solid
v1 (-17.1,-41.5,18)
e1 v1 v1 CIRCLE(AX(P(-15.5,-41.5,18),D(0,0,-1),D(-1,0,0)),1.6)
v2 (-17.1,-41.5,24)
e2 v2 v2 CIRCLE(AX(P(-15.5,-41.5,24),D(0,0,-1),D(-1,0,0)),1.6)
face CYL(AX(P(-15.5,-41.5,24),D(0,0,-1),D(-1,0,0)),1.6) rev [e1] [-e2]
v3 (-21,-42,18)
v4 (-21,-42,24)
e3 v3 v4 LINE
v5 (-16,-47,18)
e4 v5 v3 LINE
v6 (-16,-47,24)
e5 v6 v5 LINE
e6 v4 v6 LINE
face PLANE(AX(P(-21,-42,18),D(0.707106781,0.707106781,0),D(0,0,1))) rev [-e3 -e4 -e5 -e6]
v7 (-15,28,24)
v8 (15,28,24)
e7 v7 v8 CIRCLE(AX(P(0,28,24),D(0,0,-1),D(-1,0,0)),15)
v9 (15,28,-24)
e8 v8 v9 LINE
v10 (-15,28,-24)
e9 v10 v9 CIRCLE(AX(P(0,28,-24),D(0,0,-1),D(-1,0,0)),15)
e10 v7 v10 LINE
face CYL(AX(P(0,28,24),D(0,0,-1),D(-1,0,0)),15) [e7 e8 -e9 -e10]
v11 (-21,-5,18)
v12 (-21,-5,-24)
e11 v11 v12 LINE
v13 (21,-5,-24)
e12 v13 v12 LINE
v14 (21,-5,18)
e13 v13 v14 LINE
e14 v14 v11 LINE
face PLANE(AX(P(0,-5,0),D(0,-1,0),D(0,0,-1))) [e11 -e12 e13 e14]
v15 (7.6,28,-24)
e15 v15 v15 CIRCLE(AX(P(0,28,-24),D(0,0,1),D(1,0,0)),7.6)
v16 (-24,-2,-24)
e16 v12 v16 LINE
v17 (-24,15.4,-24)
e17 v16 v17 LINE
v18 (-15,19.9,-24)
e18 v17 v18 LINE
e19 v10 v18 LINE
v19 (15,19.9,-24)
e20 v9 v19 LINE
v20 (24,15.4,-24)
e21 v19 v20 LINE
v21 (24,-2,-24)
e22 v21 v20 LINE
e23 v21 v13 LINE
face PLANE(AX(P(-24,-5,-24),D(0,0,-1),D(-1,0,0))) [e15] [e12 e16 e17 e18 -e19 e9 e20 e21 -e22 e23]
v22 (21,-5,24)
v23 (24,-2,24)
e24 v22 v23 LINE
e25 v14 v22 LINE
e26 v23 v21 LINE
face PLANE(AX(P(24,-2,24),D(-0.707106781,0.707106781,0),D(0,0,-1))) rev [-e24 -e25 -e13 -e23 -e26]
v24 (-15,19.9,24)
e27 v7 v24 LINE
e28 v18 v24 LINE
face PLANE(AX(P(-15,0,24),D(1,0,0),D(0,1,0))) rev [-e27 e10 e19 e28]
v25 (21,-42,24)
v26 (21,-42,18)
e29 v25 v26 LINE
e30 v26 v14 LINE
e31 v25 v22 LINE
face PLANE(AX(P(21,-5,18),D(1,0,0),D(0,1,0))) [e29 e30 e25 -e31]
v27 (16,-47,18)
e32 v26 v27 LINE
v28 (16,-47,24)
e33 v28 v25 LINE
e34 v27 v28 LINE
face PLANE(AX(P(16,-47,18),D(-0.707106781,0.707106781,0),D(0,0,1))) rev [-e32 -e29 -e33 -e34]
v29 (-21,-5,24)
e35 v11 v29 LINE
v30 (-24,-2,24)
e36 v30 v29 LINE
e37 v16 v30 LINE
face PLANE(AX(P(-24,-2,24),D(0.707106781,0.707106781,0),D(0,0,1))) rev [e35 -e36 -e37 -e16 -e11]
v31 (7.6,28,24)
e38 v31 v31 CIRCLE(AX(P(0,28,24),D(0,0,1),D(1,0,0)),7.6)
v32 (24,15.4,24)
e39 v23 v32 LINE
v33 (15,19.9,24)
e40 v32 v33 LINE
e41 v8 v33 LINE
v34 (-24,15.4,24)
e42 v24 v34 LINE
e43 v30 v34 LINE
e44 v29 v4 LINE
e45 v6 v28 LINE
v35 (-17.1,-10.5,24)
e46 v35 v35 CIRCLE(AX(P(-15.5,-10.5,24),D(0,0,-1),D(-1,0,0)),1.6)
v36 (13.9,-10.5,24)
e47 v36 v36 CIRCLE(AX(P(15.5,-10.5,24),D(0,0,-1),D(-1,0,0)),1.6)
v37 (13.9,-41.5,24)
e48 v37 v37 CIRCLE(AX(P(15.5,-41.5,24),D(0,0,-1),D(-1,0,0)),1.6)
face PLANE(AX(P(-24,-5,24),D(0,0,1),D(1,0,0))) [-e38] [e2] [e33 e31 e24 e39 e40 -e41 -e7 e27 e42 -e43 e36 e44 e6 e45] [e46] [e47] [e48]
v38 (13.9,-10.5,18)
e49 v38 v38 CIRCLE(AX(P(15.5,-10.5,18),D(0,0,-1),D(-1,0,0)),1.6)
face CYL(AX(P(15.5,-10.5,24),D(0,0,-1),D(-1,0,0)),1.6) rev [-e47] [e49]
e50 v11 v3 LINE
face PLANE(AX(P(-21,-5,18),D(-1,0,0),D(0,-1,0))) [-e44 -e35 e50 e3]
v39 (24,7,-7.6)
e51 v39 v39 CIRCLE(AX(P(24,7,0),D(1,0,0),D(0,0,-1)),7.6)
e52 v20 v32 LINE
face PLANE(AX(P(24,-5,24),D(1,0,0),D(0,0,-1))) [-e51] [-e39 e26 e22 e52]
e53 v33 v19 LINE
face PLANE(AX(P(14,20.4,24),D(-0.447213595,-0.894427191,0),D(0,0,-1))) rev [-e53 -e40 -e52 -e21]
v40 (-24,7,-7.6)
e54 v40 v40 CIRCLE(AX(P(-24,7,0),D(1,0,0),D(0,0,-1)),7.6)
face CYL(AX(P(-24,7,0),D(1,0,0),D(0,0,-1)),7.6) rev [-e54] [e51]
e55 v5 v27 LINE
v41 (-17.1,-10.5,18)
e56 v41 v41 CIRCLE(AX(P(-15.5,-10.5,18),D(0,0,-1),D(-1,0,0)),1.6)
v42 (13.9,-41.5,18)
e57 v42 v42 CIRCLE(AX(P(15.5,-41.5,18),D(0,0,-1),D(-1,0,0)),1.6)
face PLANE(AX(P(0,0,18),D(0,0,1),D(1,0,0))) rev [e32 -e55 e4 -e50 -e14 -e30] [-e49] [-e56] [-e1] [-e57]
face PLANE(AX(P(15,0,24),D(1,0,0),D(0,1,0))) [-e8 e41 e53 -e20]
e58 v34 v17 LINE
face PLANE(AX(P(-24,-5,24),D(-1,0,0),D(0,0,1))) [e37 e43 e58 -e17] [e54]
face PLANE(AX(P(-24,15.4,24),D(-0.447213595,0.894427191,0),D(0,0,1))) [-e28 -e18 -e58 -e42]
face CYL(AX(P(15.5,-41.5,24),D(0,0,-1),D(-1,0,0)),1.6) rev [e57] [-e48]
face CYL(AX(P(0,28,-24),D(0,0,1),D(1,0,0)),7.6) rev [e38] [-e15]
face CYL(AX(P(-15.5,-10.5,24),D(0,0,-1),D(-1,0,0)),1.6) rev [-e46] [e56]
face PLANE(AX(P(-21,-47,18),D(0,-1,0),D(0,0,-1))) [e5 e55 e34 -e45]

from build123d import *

# Parameters (mm, degrees)
BOSS_EXTRUDE1_DEPTH      = 55
BOSS_EXTRUDE1_DEPTH_BACK = 5
SKETCH1_W                = 48
SKETCH1_H                = 48
SKETCH2_R                = 7.6
CUT_EXTRUDE1_DEPTH       = 77.843997814
SKETCH3_R                = 7.6
CUT_EXTRUDE2_DEPTH       = 77.843997814
SKETCH6_W                = 42
SKETCH6_H                = 42
BOSS_EXTRUDE2_DEPTH      = 6
SKETCH7_R                = 1.6
CUT_EXTRUDE4_DEPTH       = 74.246160309
CUT_EXTRUDE5_DEPTH       = 77.843997814
CHAMFER12_SIZE           = 5
CHAMFER12_SIZE_2         = 10
CHAMFER13_SIZE           = 10
CHAMFER13_SIZE_2         = 5
CHAMFER14_SIZE           = 3
CHAMFER15_SIZE           = 5


with BuildPart() as part:
    # Sketch1 → Boss-Extrude1 (new, two sides: drawn at the far end of the back side and taken through both)
    with BuildSketch(Plane(origin=(0, 0, 0), x_dir=(1, 0, 0), z_dir=(0, 1, 0)).offset(-BOSS_EXTRUDE1_DEPTH_BACK)):
        Rectangle(SKETCH1_W, SKETCH1_H)
    extrude(amount=BOSS_EXTRUDE1_DEPTH + BOSS_EXTRUDE1_DEPTH_BACK)

    # Sketch2 → Cut-Extrude1 (cut, through all)
    with BuildSketch(Plane.XY.offset(24)):
        with Locations((0, 28)):
            Circle(SKETCH2_R)
    extrude(amount=-CUT_EXTRUDE1_DEPTH, mode=Mode.SUBTRACT)

    # Sketch3 → Cut-Extrude2 (cut, through all)
    with BuildSketch(Plane(origin=(24, 0, 0), x_dir=(0, 0, -1), z_dir=(1, 0, 0))):
        with Locations((0, 7)):
            Circle(SKETCH3_R)
    extrude(amount=-CUT_EXTRUDE2_DEPTH, mode=Mode.SUBTRACT)

    # Sketch6 → Boss-Extrude2 (add)
    with BuildSketch(Plane.XY.offset(24)):
        with Locations((0, -26)):
            Rectangle(SKETCH6_W, SKETCH6_H)
    extrude(amount=-BOSS_EXTRUDE2_DEPTH)

    # Sketch7 → Cut-Extrude4 (cut, through all)
    with BuildSketch(Plane(origin=(0, 0, 18), x_dir=(-1, 0, 0), z_dir=(0, 0, -1))):
        with Locations((-15.5, -10.5)):
            Circle(SKETCH7_R)
        with Locations((-15.5, -41.5)):
            Circle(SKETCH7_R)
        with Locations((15.5, -41.5)):
            Circle(SKETCH7_R)
        with Locations((15.5, -10.5)):
            Circle(SKETCH7_R)
    extrude(amount=-CUT_EXTRUDE4_DEPTH, mode=Mode.SUBTRACT)

    # Sketch9 → Cut-Extrude5 (cut, through all)
    with BuildSketch(Plane(origin=(0, 0, -24), x_dir=(-1, 0, 0), z_dir=(0, 0, -1))):
        with BuildLine():
            Line((-15, 28), (-15, 20.4))
            Line((-15, 20.4), (-24, 20.4))
            Line((-24, 20.4), (-24, 55))
            Line((-24, 55), (24, 55))
            Line((24, 55), (24, 20.4))
            Line((24, 20.4), (15, 20.4))
            Line((15, 20.4), (15, 28))
            ThreePointArc((15, 28), (0, 43), (-15, 28))
        make_face()
    extrude(amount=-CUT_EXTRUDE5_DEPTH, mode=Mode.SUBTRACT)

    # Chamfer12
    # the kernel refuses this chamfer: 10, 5 mm, written as the material it takes off along each edge
    with BuildSketch(Plane(origin=(24, 20.4, -49.898288738), x_dir=(0.06891834360170909, -0.9976223042390326, 0), z_dir=(0, 0, 1))) as chamfer12_piece_1_section:
        Polygon((CHAMFER12_SIZE * 0.997622304239, -CHAMFER12_SIZE * 0.0689183436017), (-CHAMFER12_SIZE_2 * 0.0689183436017, -CHAMFER12_SIZE_2 * 0.997622304239), (0, 0), align=None)
    chamfer12_piece_1 = extrude(amount=99.796577476, mode=Mode.PRIVATE)
    chamfer12_piece_1 = split(chamfer12_piece_1, bisect_by=Plane(origin=(15, 18.773620907, 0), z_dir=(1, 0, 0)), keep=Keep.TOP, mode=Mode.PRIVATE)
    add(chamfer12_piece_1, mode=Mode.SUBTRACT)

    # Chamfer13
    # the kernel refuses this chamfer: 10, 5 mm, written as the material it takes off along each edge
    with BuildSketch(Plane(origin=(-24, 20.4, -49.898288738), x_dir=(0.9998508956747119, 0.017268075123668212, 0), z_dir=(0, 0, 1))) as chamfer13_piece_1_section:
        Polygon((CHAMFER13_SIZE * 0.999850895675, -CHAMFER13_SIZE * 0.0172680751237), (-CHAMFER13_SIZE_2 * 0.0172680751237, -CHAMFER13_SIZE_2 * 0.999850895675), (0, 0), align=None)
    chamfer13_piece_1 = extrude(amount=99.796577476, mode=Mode.PRIVATE)
    chamfer13_piece_1 = split(chamfer13_piece_1, bisect_by=Plane(origin=(-15, 18.773620907, 0), z_dir=(-1, 0, 0)), keep=Keep.TOP, mode=Mode.PRIVATE)
    add(chamfer13_piece_1, mode=Mode.SUBTRACT)

    # Chamfer14
    chamfer14_edges = [part.edges().sort_by_distance(p)[0] for p in [
        (-24, -5, 0),
        (24, -5, 0),
    ]]
    chamfer(chamfer14_edges, length=CHAMFER14_SIZE)

    # Chamfer15
    chamfer15_edges = [part.edges().sort_by_distance(p)[0] for p in [
        (-21, -47, 21),
        (21, -47, 21),
    ]]
    chamfer(chamfer15_edges, length=CHAMFER15_SIZE)


solid = part.part
